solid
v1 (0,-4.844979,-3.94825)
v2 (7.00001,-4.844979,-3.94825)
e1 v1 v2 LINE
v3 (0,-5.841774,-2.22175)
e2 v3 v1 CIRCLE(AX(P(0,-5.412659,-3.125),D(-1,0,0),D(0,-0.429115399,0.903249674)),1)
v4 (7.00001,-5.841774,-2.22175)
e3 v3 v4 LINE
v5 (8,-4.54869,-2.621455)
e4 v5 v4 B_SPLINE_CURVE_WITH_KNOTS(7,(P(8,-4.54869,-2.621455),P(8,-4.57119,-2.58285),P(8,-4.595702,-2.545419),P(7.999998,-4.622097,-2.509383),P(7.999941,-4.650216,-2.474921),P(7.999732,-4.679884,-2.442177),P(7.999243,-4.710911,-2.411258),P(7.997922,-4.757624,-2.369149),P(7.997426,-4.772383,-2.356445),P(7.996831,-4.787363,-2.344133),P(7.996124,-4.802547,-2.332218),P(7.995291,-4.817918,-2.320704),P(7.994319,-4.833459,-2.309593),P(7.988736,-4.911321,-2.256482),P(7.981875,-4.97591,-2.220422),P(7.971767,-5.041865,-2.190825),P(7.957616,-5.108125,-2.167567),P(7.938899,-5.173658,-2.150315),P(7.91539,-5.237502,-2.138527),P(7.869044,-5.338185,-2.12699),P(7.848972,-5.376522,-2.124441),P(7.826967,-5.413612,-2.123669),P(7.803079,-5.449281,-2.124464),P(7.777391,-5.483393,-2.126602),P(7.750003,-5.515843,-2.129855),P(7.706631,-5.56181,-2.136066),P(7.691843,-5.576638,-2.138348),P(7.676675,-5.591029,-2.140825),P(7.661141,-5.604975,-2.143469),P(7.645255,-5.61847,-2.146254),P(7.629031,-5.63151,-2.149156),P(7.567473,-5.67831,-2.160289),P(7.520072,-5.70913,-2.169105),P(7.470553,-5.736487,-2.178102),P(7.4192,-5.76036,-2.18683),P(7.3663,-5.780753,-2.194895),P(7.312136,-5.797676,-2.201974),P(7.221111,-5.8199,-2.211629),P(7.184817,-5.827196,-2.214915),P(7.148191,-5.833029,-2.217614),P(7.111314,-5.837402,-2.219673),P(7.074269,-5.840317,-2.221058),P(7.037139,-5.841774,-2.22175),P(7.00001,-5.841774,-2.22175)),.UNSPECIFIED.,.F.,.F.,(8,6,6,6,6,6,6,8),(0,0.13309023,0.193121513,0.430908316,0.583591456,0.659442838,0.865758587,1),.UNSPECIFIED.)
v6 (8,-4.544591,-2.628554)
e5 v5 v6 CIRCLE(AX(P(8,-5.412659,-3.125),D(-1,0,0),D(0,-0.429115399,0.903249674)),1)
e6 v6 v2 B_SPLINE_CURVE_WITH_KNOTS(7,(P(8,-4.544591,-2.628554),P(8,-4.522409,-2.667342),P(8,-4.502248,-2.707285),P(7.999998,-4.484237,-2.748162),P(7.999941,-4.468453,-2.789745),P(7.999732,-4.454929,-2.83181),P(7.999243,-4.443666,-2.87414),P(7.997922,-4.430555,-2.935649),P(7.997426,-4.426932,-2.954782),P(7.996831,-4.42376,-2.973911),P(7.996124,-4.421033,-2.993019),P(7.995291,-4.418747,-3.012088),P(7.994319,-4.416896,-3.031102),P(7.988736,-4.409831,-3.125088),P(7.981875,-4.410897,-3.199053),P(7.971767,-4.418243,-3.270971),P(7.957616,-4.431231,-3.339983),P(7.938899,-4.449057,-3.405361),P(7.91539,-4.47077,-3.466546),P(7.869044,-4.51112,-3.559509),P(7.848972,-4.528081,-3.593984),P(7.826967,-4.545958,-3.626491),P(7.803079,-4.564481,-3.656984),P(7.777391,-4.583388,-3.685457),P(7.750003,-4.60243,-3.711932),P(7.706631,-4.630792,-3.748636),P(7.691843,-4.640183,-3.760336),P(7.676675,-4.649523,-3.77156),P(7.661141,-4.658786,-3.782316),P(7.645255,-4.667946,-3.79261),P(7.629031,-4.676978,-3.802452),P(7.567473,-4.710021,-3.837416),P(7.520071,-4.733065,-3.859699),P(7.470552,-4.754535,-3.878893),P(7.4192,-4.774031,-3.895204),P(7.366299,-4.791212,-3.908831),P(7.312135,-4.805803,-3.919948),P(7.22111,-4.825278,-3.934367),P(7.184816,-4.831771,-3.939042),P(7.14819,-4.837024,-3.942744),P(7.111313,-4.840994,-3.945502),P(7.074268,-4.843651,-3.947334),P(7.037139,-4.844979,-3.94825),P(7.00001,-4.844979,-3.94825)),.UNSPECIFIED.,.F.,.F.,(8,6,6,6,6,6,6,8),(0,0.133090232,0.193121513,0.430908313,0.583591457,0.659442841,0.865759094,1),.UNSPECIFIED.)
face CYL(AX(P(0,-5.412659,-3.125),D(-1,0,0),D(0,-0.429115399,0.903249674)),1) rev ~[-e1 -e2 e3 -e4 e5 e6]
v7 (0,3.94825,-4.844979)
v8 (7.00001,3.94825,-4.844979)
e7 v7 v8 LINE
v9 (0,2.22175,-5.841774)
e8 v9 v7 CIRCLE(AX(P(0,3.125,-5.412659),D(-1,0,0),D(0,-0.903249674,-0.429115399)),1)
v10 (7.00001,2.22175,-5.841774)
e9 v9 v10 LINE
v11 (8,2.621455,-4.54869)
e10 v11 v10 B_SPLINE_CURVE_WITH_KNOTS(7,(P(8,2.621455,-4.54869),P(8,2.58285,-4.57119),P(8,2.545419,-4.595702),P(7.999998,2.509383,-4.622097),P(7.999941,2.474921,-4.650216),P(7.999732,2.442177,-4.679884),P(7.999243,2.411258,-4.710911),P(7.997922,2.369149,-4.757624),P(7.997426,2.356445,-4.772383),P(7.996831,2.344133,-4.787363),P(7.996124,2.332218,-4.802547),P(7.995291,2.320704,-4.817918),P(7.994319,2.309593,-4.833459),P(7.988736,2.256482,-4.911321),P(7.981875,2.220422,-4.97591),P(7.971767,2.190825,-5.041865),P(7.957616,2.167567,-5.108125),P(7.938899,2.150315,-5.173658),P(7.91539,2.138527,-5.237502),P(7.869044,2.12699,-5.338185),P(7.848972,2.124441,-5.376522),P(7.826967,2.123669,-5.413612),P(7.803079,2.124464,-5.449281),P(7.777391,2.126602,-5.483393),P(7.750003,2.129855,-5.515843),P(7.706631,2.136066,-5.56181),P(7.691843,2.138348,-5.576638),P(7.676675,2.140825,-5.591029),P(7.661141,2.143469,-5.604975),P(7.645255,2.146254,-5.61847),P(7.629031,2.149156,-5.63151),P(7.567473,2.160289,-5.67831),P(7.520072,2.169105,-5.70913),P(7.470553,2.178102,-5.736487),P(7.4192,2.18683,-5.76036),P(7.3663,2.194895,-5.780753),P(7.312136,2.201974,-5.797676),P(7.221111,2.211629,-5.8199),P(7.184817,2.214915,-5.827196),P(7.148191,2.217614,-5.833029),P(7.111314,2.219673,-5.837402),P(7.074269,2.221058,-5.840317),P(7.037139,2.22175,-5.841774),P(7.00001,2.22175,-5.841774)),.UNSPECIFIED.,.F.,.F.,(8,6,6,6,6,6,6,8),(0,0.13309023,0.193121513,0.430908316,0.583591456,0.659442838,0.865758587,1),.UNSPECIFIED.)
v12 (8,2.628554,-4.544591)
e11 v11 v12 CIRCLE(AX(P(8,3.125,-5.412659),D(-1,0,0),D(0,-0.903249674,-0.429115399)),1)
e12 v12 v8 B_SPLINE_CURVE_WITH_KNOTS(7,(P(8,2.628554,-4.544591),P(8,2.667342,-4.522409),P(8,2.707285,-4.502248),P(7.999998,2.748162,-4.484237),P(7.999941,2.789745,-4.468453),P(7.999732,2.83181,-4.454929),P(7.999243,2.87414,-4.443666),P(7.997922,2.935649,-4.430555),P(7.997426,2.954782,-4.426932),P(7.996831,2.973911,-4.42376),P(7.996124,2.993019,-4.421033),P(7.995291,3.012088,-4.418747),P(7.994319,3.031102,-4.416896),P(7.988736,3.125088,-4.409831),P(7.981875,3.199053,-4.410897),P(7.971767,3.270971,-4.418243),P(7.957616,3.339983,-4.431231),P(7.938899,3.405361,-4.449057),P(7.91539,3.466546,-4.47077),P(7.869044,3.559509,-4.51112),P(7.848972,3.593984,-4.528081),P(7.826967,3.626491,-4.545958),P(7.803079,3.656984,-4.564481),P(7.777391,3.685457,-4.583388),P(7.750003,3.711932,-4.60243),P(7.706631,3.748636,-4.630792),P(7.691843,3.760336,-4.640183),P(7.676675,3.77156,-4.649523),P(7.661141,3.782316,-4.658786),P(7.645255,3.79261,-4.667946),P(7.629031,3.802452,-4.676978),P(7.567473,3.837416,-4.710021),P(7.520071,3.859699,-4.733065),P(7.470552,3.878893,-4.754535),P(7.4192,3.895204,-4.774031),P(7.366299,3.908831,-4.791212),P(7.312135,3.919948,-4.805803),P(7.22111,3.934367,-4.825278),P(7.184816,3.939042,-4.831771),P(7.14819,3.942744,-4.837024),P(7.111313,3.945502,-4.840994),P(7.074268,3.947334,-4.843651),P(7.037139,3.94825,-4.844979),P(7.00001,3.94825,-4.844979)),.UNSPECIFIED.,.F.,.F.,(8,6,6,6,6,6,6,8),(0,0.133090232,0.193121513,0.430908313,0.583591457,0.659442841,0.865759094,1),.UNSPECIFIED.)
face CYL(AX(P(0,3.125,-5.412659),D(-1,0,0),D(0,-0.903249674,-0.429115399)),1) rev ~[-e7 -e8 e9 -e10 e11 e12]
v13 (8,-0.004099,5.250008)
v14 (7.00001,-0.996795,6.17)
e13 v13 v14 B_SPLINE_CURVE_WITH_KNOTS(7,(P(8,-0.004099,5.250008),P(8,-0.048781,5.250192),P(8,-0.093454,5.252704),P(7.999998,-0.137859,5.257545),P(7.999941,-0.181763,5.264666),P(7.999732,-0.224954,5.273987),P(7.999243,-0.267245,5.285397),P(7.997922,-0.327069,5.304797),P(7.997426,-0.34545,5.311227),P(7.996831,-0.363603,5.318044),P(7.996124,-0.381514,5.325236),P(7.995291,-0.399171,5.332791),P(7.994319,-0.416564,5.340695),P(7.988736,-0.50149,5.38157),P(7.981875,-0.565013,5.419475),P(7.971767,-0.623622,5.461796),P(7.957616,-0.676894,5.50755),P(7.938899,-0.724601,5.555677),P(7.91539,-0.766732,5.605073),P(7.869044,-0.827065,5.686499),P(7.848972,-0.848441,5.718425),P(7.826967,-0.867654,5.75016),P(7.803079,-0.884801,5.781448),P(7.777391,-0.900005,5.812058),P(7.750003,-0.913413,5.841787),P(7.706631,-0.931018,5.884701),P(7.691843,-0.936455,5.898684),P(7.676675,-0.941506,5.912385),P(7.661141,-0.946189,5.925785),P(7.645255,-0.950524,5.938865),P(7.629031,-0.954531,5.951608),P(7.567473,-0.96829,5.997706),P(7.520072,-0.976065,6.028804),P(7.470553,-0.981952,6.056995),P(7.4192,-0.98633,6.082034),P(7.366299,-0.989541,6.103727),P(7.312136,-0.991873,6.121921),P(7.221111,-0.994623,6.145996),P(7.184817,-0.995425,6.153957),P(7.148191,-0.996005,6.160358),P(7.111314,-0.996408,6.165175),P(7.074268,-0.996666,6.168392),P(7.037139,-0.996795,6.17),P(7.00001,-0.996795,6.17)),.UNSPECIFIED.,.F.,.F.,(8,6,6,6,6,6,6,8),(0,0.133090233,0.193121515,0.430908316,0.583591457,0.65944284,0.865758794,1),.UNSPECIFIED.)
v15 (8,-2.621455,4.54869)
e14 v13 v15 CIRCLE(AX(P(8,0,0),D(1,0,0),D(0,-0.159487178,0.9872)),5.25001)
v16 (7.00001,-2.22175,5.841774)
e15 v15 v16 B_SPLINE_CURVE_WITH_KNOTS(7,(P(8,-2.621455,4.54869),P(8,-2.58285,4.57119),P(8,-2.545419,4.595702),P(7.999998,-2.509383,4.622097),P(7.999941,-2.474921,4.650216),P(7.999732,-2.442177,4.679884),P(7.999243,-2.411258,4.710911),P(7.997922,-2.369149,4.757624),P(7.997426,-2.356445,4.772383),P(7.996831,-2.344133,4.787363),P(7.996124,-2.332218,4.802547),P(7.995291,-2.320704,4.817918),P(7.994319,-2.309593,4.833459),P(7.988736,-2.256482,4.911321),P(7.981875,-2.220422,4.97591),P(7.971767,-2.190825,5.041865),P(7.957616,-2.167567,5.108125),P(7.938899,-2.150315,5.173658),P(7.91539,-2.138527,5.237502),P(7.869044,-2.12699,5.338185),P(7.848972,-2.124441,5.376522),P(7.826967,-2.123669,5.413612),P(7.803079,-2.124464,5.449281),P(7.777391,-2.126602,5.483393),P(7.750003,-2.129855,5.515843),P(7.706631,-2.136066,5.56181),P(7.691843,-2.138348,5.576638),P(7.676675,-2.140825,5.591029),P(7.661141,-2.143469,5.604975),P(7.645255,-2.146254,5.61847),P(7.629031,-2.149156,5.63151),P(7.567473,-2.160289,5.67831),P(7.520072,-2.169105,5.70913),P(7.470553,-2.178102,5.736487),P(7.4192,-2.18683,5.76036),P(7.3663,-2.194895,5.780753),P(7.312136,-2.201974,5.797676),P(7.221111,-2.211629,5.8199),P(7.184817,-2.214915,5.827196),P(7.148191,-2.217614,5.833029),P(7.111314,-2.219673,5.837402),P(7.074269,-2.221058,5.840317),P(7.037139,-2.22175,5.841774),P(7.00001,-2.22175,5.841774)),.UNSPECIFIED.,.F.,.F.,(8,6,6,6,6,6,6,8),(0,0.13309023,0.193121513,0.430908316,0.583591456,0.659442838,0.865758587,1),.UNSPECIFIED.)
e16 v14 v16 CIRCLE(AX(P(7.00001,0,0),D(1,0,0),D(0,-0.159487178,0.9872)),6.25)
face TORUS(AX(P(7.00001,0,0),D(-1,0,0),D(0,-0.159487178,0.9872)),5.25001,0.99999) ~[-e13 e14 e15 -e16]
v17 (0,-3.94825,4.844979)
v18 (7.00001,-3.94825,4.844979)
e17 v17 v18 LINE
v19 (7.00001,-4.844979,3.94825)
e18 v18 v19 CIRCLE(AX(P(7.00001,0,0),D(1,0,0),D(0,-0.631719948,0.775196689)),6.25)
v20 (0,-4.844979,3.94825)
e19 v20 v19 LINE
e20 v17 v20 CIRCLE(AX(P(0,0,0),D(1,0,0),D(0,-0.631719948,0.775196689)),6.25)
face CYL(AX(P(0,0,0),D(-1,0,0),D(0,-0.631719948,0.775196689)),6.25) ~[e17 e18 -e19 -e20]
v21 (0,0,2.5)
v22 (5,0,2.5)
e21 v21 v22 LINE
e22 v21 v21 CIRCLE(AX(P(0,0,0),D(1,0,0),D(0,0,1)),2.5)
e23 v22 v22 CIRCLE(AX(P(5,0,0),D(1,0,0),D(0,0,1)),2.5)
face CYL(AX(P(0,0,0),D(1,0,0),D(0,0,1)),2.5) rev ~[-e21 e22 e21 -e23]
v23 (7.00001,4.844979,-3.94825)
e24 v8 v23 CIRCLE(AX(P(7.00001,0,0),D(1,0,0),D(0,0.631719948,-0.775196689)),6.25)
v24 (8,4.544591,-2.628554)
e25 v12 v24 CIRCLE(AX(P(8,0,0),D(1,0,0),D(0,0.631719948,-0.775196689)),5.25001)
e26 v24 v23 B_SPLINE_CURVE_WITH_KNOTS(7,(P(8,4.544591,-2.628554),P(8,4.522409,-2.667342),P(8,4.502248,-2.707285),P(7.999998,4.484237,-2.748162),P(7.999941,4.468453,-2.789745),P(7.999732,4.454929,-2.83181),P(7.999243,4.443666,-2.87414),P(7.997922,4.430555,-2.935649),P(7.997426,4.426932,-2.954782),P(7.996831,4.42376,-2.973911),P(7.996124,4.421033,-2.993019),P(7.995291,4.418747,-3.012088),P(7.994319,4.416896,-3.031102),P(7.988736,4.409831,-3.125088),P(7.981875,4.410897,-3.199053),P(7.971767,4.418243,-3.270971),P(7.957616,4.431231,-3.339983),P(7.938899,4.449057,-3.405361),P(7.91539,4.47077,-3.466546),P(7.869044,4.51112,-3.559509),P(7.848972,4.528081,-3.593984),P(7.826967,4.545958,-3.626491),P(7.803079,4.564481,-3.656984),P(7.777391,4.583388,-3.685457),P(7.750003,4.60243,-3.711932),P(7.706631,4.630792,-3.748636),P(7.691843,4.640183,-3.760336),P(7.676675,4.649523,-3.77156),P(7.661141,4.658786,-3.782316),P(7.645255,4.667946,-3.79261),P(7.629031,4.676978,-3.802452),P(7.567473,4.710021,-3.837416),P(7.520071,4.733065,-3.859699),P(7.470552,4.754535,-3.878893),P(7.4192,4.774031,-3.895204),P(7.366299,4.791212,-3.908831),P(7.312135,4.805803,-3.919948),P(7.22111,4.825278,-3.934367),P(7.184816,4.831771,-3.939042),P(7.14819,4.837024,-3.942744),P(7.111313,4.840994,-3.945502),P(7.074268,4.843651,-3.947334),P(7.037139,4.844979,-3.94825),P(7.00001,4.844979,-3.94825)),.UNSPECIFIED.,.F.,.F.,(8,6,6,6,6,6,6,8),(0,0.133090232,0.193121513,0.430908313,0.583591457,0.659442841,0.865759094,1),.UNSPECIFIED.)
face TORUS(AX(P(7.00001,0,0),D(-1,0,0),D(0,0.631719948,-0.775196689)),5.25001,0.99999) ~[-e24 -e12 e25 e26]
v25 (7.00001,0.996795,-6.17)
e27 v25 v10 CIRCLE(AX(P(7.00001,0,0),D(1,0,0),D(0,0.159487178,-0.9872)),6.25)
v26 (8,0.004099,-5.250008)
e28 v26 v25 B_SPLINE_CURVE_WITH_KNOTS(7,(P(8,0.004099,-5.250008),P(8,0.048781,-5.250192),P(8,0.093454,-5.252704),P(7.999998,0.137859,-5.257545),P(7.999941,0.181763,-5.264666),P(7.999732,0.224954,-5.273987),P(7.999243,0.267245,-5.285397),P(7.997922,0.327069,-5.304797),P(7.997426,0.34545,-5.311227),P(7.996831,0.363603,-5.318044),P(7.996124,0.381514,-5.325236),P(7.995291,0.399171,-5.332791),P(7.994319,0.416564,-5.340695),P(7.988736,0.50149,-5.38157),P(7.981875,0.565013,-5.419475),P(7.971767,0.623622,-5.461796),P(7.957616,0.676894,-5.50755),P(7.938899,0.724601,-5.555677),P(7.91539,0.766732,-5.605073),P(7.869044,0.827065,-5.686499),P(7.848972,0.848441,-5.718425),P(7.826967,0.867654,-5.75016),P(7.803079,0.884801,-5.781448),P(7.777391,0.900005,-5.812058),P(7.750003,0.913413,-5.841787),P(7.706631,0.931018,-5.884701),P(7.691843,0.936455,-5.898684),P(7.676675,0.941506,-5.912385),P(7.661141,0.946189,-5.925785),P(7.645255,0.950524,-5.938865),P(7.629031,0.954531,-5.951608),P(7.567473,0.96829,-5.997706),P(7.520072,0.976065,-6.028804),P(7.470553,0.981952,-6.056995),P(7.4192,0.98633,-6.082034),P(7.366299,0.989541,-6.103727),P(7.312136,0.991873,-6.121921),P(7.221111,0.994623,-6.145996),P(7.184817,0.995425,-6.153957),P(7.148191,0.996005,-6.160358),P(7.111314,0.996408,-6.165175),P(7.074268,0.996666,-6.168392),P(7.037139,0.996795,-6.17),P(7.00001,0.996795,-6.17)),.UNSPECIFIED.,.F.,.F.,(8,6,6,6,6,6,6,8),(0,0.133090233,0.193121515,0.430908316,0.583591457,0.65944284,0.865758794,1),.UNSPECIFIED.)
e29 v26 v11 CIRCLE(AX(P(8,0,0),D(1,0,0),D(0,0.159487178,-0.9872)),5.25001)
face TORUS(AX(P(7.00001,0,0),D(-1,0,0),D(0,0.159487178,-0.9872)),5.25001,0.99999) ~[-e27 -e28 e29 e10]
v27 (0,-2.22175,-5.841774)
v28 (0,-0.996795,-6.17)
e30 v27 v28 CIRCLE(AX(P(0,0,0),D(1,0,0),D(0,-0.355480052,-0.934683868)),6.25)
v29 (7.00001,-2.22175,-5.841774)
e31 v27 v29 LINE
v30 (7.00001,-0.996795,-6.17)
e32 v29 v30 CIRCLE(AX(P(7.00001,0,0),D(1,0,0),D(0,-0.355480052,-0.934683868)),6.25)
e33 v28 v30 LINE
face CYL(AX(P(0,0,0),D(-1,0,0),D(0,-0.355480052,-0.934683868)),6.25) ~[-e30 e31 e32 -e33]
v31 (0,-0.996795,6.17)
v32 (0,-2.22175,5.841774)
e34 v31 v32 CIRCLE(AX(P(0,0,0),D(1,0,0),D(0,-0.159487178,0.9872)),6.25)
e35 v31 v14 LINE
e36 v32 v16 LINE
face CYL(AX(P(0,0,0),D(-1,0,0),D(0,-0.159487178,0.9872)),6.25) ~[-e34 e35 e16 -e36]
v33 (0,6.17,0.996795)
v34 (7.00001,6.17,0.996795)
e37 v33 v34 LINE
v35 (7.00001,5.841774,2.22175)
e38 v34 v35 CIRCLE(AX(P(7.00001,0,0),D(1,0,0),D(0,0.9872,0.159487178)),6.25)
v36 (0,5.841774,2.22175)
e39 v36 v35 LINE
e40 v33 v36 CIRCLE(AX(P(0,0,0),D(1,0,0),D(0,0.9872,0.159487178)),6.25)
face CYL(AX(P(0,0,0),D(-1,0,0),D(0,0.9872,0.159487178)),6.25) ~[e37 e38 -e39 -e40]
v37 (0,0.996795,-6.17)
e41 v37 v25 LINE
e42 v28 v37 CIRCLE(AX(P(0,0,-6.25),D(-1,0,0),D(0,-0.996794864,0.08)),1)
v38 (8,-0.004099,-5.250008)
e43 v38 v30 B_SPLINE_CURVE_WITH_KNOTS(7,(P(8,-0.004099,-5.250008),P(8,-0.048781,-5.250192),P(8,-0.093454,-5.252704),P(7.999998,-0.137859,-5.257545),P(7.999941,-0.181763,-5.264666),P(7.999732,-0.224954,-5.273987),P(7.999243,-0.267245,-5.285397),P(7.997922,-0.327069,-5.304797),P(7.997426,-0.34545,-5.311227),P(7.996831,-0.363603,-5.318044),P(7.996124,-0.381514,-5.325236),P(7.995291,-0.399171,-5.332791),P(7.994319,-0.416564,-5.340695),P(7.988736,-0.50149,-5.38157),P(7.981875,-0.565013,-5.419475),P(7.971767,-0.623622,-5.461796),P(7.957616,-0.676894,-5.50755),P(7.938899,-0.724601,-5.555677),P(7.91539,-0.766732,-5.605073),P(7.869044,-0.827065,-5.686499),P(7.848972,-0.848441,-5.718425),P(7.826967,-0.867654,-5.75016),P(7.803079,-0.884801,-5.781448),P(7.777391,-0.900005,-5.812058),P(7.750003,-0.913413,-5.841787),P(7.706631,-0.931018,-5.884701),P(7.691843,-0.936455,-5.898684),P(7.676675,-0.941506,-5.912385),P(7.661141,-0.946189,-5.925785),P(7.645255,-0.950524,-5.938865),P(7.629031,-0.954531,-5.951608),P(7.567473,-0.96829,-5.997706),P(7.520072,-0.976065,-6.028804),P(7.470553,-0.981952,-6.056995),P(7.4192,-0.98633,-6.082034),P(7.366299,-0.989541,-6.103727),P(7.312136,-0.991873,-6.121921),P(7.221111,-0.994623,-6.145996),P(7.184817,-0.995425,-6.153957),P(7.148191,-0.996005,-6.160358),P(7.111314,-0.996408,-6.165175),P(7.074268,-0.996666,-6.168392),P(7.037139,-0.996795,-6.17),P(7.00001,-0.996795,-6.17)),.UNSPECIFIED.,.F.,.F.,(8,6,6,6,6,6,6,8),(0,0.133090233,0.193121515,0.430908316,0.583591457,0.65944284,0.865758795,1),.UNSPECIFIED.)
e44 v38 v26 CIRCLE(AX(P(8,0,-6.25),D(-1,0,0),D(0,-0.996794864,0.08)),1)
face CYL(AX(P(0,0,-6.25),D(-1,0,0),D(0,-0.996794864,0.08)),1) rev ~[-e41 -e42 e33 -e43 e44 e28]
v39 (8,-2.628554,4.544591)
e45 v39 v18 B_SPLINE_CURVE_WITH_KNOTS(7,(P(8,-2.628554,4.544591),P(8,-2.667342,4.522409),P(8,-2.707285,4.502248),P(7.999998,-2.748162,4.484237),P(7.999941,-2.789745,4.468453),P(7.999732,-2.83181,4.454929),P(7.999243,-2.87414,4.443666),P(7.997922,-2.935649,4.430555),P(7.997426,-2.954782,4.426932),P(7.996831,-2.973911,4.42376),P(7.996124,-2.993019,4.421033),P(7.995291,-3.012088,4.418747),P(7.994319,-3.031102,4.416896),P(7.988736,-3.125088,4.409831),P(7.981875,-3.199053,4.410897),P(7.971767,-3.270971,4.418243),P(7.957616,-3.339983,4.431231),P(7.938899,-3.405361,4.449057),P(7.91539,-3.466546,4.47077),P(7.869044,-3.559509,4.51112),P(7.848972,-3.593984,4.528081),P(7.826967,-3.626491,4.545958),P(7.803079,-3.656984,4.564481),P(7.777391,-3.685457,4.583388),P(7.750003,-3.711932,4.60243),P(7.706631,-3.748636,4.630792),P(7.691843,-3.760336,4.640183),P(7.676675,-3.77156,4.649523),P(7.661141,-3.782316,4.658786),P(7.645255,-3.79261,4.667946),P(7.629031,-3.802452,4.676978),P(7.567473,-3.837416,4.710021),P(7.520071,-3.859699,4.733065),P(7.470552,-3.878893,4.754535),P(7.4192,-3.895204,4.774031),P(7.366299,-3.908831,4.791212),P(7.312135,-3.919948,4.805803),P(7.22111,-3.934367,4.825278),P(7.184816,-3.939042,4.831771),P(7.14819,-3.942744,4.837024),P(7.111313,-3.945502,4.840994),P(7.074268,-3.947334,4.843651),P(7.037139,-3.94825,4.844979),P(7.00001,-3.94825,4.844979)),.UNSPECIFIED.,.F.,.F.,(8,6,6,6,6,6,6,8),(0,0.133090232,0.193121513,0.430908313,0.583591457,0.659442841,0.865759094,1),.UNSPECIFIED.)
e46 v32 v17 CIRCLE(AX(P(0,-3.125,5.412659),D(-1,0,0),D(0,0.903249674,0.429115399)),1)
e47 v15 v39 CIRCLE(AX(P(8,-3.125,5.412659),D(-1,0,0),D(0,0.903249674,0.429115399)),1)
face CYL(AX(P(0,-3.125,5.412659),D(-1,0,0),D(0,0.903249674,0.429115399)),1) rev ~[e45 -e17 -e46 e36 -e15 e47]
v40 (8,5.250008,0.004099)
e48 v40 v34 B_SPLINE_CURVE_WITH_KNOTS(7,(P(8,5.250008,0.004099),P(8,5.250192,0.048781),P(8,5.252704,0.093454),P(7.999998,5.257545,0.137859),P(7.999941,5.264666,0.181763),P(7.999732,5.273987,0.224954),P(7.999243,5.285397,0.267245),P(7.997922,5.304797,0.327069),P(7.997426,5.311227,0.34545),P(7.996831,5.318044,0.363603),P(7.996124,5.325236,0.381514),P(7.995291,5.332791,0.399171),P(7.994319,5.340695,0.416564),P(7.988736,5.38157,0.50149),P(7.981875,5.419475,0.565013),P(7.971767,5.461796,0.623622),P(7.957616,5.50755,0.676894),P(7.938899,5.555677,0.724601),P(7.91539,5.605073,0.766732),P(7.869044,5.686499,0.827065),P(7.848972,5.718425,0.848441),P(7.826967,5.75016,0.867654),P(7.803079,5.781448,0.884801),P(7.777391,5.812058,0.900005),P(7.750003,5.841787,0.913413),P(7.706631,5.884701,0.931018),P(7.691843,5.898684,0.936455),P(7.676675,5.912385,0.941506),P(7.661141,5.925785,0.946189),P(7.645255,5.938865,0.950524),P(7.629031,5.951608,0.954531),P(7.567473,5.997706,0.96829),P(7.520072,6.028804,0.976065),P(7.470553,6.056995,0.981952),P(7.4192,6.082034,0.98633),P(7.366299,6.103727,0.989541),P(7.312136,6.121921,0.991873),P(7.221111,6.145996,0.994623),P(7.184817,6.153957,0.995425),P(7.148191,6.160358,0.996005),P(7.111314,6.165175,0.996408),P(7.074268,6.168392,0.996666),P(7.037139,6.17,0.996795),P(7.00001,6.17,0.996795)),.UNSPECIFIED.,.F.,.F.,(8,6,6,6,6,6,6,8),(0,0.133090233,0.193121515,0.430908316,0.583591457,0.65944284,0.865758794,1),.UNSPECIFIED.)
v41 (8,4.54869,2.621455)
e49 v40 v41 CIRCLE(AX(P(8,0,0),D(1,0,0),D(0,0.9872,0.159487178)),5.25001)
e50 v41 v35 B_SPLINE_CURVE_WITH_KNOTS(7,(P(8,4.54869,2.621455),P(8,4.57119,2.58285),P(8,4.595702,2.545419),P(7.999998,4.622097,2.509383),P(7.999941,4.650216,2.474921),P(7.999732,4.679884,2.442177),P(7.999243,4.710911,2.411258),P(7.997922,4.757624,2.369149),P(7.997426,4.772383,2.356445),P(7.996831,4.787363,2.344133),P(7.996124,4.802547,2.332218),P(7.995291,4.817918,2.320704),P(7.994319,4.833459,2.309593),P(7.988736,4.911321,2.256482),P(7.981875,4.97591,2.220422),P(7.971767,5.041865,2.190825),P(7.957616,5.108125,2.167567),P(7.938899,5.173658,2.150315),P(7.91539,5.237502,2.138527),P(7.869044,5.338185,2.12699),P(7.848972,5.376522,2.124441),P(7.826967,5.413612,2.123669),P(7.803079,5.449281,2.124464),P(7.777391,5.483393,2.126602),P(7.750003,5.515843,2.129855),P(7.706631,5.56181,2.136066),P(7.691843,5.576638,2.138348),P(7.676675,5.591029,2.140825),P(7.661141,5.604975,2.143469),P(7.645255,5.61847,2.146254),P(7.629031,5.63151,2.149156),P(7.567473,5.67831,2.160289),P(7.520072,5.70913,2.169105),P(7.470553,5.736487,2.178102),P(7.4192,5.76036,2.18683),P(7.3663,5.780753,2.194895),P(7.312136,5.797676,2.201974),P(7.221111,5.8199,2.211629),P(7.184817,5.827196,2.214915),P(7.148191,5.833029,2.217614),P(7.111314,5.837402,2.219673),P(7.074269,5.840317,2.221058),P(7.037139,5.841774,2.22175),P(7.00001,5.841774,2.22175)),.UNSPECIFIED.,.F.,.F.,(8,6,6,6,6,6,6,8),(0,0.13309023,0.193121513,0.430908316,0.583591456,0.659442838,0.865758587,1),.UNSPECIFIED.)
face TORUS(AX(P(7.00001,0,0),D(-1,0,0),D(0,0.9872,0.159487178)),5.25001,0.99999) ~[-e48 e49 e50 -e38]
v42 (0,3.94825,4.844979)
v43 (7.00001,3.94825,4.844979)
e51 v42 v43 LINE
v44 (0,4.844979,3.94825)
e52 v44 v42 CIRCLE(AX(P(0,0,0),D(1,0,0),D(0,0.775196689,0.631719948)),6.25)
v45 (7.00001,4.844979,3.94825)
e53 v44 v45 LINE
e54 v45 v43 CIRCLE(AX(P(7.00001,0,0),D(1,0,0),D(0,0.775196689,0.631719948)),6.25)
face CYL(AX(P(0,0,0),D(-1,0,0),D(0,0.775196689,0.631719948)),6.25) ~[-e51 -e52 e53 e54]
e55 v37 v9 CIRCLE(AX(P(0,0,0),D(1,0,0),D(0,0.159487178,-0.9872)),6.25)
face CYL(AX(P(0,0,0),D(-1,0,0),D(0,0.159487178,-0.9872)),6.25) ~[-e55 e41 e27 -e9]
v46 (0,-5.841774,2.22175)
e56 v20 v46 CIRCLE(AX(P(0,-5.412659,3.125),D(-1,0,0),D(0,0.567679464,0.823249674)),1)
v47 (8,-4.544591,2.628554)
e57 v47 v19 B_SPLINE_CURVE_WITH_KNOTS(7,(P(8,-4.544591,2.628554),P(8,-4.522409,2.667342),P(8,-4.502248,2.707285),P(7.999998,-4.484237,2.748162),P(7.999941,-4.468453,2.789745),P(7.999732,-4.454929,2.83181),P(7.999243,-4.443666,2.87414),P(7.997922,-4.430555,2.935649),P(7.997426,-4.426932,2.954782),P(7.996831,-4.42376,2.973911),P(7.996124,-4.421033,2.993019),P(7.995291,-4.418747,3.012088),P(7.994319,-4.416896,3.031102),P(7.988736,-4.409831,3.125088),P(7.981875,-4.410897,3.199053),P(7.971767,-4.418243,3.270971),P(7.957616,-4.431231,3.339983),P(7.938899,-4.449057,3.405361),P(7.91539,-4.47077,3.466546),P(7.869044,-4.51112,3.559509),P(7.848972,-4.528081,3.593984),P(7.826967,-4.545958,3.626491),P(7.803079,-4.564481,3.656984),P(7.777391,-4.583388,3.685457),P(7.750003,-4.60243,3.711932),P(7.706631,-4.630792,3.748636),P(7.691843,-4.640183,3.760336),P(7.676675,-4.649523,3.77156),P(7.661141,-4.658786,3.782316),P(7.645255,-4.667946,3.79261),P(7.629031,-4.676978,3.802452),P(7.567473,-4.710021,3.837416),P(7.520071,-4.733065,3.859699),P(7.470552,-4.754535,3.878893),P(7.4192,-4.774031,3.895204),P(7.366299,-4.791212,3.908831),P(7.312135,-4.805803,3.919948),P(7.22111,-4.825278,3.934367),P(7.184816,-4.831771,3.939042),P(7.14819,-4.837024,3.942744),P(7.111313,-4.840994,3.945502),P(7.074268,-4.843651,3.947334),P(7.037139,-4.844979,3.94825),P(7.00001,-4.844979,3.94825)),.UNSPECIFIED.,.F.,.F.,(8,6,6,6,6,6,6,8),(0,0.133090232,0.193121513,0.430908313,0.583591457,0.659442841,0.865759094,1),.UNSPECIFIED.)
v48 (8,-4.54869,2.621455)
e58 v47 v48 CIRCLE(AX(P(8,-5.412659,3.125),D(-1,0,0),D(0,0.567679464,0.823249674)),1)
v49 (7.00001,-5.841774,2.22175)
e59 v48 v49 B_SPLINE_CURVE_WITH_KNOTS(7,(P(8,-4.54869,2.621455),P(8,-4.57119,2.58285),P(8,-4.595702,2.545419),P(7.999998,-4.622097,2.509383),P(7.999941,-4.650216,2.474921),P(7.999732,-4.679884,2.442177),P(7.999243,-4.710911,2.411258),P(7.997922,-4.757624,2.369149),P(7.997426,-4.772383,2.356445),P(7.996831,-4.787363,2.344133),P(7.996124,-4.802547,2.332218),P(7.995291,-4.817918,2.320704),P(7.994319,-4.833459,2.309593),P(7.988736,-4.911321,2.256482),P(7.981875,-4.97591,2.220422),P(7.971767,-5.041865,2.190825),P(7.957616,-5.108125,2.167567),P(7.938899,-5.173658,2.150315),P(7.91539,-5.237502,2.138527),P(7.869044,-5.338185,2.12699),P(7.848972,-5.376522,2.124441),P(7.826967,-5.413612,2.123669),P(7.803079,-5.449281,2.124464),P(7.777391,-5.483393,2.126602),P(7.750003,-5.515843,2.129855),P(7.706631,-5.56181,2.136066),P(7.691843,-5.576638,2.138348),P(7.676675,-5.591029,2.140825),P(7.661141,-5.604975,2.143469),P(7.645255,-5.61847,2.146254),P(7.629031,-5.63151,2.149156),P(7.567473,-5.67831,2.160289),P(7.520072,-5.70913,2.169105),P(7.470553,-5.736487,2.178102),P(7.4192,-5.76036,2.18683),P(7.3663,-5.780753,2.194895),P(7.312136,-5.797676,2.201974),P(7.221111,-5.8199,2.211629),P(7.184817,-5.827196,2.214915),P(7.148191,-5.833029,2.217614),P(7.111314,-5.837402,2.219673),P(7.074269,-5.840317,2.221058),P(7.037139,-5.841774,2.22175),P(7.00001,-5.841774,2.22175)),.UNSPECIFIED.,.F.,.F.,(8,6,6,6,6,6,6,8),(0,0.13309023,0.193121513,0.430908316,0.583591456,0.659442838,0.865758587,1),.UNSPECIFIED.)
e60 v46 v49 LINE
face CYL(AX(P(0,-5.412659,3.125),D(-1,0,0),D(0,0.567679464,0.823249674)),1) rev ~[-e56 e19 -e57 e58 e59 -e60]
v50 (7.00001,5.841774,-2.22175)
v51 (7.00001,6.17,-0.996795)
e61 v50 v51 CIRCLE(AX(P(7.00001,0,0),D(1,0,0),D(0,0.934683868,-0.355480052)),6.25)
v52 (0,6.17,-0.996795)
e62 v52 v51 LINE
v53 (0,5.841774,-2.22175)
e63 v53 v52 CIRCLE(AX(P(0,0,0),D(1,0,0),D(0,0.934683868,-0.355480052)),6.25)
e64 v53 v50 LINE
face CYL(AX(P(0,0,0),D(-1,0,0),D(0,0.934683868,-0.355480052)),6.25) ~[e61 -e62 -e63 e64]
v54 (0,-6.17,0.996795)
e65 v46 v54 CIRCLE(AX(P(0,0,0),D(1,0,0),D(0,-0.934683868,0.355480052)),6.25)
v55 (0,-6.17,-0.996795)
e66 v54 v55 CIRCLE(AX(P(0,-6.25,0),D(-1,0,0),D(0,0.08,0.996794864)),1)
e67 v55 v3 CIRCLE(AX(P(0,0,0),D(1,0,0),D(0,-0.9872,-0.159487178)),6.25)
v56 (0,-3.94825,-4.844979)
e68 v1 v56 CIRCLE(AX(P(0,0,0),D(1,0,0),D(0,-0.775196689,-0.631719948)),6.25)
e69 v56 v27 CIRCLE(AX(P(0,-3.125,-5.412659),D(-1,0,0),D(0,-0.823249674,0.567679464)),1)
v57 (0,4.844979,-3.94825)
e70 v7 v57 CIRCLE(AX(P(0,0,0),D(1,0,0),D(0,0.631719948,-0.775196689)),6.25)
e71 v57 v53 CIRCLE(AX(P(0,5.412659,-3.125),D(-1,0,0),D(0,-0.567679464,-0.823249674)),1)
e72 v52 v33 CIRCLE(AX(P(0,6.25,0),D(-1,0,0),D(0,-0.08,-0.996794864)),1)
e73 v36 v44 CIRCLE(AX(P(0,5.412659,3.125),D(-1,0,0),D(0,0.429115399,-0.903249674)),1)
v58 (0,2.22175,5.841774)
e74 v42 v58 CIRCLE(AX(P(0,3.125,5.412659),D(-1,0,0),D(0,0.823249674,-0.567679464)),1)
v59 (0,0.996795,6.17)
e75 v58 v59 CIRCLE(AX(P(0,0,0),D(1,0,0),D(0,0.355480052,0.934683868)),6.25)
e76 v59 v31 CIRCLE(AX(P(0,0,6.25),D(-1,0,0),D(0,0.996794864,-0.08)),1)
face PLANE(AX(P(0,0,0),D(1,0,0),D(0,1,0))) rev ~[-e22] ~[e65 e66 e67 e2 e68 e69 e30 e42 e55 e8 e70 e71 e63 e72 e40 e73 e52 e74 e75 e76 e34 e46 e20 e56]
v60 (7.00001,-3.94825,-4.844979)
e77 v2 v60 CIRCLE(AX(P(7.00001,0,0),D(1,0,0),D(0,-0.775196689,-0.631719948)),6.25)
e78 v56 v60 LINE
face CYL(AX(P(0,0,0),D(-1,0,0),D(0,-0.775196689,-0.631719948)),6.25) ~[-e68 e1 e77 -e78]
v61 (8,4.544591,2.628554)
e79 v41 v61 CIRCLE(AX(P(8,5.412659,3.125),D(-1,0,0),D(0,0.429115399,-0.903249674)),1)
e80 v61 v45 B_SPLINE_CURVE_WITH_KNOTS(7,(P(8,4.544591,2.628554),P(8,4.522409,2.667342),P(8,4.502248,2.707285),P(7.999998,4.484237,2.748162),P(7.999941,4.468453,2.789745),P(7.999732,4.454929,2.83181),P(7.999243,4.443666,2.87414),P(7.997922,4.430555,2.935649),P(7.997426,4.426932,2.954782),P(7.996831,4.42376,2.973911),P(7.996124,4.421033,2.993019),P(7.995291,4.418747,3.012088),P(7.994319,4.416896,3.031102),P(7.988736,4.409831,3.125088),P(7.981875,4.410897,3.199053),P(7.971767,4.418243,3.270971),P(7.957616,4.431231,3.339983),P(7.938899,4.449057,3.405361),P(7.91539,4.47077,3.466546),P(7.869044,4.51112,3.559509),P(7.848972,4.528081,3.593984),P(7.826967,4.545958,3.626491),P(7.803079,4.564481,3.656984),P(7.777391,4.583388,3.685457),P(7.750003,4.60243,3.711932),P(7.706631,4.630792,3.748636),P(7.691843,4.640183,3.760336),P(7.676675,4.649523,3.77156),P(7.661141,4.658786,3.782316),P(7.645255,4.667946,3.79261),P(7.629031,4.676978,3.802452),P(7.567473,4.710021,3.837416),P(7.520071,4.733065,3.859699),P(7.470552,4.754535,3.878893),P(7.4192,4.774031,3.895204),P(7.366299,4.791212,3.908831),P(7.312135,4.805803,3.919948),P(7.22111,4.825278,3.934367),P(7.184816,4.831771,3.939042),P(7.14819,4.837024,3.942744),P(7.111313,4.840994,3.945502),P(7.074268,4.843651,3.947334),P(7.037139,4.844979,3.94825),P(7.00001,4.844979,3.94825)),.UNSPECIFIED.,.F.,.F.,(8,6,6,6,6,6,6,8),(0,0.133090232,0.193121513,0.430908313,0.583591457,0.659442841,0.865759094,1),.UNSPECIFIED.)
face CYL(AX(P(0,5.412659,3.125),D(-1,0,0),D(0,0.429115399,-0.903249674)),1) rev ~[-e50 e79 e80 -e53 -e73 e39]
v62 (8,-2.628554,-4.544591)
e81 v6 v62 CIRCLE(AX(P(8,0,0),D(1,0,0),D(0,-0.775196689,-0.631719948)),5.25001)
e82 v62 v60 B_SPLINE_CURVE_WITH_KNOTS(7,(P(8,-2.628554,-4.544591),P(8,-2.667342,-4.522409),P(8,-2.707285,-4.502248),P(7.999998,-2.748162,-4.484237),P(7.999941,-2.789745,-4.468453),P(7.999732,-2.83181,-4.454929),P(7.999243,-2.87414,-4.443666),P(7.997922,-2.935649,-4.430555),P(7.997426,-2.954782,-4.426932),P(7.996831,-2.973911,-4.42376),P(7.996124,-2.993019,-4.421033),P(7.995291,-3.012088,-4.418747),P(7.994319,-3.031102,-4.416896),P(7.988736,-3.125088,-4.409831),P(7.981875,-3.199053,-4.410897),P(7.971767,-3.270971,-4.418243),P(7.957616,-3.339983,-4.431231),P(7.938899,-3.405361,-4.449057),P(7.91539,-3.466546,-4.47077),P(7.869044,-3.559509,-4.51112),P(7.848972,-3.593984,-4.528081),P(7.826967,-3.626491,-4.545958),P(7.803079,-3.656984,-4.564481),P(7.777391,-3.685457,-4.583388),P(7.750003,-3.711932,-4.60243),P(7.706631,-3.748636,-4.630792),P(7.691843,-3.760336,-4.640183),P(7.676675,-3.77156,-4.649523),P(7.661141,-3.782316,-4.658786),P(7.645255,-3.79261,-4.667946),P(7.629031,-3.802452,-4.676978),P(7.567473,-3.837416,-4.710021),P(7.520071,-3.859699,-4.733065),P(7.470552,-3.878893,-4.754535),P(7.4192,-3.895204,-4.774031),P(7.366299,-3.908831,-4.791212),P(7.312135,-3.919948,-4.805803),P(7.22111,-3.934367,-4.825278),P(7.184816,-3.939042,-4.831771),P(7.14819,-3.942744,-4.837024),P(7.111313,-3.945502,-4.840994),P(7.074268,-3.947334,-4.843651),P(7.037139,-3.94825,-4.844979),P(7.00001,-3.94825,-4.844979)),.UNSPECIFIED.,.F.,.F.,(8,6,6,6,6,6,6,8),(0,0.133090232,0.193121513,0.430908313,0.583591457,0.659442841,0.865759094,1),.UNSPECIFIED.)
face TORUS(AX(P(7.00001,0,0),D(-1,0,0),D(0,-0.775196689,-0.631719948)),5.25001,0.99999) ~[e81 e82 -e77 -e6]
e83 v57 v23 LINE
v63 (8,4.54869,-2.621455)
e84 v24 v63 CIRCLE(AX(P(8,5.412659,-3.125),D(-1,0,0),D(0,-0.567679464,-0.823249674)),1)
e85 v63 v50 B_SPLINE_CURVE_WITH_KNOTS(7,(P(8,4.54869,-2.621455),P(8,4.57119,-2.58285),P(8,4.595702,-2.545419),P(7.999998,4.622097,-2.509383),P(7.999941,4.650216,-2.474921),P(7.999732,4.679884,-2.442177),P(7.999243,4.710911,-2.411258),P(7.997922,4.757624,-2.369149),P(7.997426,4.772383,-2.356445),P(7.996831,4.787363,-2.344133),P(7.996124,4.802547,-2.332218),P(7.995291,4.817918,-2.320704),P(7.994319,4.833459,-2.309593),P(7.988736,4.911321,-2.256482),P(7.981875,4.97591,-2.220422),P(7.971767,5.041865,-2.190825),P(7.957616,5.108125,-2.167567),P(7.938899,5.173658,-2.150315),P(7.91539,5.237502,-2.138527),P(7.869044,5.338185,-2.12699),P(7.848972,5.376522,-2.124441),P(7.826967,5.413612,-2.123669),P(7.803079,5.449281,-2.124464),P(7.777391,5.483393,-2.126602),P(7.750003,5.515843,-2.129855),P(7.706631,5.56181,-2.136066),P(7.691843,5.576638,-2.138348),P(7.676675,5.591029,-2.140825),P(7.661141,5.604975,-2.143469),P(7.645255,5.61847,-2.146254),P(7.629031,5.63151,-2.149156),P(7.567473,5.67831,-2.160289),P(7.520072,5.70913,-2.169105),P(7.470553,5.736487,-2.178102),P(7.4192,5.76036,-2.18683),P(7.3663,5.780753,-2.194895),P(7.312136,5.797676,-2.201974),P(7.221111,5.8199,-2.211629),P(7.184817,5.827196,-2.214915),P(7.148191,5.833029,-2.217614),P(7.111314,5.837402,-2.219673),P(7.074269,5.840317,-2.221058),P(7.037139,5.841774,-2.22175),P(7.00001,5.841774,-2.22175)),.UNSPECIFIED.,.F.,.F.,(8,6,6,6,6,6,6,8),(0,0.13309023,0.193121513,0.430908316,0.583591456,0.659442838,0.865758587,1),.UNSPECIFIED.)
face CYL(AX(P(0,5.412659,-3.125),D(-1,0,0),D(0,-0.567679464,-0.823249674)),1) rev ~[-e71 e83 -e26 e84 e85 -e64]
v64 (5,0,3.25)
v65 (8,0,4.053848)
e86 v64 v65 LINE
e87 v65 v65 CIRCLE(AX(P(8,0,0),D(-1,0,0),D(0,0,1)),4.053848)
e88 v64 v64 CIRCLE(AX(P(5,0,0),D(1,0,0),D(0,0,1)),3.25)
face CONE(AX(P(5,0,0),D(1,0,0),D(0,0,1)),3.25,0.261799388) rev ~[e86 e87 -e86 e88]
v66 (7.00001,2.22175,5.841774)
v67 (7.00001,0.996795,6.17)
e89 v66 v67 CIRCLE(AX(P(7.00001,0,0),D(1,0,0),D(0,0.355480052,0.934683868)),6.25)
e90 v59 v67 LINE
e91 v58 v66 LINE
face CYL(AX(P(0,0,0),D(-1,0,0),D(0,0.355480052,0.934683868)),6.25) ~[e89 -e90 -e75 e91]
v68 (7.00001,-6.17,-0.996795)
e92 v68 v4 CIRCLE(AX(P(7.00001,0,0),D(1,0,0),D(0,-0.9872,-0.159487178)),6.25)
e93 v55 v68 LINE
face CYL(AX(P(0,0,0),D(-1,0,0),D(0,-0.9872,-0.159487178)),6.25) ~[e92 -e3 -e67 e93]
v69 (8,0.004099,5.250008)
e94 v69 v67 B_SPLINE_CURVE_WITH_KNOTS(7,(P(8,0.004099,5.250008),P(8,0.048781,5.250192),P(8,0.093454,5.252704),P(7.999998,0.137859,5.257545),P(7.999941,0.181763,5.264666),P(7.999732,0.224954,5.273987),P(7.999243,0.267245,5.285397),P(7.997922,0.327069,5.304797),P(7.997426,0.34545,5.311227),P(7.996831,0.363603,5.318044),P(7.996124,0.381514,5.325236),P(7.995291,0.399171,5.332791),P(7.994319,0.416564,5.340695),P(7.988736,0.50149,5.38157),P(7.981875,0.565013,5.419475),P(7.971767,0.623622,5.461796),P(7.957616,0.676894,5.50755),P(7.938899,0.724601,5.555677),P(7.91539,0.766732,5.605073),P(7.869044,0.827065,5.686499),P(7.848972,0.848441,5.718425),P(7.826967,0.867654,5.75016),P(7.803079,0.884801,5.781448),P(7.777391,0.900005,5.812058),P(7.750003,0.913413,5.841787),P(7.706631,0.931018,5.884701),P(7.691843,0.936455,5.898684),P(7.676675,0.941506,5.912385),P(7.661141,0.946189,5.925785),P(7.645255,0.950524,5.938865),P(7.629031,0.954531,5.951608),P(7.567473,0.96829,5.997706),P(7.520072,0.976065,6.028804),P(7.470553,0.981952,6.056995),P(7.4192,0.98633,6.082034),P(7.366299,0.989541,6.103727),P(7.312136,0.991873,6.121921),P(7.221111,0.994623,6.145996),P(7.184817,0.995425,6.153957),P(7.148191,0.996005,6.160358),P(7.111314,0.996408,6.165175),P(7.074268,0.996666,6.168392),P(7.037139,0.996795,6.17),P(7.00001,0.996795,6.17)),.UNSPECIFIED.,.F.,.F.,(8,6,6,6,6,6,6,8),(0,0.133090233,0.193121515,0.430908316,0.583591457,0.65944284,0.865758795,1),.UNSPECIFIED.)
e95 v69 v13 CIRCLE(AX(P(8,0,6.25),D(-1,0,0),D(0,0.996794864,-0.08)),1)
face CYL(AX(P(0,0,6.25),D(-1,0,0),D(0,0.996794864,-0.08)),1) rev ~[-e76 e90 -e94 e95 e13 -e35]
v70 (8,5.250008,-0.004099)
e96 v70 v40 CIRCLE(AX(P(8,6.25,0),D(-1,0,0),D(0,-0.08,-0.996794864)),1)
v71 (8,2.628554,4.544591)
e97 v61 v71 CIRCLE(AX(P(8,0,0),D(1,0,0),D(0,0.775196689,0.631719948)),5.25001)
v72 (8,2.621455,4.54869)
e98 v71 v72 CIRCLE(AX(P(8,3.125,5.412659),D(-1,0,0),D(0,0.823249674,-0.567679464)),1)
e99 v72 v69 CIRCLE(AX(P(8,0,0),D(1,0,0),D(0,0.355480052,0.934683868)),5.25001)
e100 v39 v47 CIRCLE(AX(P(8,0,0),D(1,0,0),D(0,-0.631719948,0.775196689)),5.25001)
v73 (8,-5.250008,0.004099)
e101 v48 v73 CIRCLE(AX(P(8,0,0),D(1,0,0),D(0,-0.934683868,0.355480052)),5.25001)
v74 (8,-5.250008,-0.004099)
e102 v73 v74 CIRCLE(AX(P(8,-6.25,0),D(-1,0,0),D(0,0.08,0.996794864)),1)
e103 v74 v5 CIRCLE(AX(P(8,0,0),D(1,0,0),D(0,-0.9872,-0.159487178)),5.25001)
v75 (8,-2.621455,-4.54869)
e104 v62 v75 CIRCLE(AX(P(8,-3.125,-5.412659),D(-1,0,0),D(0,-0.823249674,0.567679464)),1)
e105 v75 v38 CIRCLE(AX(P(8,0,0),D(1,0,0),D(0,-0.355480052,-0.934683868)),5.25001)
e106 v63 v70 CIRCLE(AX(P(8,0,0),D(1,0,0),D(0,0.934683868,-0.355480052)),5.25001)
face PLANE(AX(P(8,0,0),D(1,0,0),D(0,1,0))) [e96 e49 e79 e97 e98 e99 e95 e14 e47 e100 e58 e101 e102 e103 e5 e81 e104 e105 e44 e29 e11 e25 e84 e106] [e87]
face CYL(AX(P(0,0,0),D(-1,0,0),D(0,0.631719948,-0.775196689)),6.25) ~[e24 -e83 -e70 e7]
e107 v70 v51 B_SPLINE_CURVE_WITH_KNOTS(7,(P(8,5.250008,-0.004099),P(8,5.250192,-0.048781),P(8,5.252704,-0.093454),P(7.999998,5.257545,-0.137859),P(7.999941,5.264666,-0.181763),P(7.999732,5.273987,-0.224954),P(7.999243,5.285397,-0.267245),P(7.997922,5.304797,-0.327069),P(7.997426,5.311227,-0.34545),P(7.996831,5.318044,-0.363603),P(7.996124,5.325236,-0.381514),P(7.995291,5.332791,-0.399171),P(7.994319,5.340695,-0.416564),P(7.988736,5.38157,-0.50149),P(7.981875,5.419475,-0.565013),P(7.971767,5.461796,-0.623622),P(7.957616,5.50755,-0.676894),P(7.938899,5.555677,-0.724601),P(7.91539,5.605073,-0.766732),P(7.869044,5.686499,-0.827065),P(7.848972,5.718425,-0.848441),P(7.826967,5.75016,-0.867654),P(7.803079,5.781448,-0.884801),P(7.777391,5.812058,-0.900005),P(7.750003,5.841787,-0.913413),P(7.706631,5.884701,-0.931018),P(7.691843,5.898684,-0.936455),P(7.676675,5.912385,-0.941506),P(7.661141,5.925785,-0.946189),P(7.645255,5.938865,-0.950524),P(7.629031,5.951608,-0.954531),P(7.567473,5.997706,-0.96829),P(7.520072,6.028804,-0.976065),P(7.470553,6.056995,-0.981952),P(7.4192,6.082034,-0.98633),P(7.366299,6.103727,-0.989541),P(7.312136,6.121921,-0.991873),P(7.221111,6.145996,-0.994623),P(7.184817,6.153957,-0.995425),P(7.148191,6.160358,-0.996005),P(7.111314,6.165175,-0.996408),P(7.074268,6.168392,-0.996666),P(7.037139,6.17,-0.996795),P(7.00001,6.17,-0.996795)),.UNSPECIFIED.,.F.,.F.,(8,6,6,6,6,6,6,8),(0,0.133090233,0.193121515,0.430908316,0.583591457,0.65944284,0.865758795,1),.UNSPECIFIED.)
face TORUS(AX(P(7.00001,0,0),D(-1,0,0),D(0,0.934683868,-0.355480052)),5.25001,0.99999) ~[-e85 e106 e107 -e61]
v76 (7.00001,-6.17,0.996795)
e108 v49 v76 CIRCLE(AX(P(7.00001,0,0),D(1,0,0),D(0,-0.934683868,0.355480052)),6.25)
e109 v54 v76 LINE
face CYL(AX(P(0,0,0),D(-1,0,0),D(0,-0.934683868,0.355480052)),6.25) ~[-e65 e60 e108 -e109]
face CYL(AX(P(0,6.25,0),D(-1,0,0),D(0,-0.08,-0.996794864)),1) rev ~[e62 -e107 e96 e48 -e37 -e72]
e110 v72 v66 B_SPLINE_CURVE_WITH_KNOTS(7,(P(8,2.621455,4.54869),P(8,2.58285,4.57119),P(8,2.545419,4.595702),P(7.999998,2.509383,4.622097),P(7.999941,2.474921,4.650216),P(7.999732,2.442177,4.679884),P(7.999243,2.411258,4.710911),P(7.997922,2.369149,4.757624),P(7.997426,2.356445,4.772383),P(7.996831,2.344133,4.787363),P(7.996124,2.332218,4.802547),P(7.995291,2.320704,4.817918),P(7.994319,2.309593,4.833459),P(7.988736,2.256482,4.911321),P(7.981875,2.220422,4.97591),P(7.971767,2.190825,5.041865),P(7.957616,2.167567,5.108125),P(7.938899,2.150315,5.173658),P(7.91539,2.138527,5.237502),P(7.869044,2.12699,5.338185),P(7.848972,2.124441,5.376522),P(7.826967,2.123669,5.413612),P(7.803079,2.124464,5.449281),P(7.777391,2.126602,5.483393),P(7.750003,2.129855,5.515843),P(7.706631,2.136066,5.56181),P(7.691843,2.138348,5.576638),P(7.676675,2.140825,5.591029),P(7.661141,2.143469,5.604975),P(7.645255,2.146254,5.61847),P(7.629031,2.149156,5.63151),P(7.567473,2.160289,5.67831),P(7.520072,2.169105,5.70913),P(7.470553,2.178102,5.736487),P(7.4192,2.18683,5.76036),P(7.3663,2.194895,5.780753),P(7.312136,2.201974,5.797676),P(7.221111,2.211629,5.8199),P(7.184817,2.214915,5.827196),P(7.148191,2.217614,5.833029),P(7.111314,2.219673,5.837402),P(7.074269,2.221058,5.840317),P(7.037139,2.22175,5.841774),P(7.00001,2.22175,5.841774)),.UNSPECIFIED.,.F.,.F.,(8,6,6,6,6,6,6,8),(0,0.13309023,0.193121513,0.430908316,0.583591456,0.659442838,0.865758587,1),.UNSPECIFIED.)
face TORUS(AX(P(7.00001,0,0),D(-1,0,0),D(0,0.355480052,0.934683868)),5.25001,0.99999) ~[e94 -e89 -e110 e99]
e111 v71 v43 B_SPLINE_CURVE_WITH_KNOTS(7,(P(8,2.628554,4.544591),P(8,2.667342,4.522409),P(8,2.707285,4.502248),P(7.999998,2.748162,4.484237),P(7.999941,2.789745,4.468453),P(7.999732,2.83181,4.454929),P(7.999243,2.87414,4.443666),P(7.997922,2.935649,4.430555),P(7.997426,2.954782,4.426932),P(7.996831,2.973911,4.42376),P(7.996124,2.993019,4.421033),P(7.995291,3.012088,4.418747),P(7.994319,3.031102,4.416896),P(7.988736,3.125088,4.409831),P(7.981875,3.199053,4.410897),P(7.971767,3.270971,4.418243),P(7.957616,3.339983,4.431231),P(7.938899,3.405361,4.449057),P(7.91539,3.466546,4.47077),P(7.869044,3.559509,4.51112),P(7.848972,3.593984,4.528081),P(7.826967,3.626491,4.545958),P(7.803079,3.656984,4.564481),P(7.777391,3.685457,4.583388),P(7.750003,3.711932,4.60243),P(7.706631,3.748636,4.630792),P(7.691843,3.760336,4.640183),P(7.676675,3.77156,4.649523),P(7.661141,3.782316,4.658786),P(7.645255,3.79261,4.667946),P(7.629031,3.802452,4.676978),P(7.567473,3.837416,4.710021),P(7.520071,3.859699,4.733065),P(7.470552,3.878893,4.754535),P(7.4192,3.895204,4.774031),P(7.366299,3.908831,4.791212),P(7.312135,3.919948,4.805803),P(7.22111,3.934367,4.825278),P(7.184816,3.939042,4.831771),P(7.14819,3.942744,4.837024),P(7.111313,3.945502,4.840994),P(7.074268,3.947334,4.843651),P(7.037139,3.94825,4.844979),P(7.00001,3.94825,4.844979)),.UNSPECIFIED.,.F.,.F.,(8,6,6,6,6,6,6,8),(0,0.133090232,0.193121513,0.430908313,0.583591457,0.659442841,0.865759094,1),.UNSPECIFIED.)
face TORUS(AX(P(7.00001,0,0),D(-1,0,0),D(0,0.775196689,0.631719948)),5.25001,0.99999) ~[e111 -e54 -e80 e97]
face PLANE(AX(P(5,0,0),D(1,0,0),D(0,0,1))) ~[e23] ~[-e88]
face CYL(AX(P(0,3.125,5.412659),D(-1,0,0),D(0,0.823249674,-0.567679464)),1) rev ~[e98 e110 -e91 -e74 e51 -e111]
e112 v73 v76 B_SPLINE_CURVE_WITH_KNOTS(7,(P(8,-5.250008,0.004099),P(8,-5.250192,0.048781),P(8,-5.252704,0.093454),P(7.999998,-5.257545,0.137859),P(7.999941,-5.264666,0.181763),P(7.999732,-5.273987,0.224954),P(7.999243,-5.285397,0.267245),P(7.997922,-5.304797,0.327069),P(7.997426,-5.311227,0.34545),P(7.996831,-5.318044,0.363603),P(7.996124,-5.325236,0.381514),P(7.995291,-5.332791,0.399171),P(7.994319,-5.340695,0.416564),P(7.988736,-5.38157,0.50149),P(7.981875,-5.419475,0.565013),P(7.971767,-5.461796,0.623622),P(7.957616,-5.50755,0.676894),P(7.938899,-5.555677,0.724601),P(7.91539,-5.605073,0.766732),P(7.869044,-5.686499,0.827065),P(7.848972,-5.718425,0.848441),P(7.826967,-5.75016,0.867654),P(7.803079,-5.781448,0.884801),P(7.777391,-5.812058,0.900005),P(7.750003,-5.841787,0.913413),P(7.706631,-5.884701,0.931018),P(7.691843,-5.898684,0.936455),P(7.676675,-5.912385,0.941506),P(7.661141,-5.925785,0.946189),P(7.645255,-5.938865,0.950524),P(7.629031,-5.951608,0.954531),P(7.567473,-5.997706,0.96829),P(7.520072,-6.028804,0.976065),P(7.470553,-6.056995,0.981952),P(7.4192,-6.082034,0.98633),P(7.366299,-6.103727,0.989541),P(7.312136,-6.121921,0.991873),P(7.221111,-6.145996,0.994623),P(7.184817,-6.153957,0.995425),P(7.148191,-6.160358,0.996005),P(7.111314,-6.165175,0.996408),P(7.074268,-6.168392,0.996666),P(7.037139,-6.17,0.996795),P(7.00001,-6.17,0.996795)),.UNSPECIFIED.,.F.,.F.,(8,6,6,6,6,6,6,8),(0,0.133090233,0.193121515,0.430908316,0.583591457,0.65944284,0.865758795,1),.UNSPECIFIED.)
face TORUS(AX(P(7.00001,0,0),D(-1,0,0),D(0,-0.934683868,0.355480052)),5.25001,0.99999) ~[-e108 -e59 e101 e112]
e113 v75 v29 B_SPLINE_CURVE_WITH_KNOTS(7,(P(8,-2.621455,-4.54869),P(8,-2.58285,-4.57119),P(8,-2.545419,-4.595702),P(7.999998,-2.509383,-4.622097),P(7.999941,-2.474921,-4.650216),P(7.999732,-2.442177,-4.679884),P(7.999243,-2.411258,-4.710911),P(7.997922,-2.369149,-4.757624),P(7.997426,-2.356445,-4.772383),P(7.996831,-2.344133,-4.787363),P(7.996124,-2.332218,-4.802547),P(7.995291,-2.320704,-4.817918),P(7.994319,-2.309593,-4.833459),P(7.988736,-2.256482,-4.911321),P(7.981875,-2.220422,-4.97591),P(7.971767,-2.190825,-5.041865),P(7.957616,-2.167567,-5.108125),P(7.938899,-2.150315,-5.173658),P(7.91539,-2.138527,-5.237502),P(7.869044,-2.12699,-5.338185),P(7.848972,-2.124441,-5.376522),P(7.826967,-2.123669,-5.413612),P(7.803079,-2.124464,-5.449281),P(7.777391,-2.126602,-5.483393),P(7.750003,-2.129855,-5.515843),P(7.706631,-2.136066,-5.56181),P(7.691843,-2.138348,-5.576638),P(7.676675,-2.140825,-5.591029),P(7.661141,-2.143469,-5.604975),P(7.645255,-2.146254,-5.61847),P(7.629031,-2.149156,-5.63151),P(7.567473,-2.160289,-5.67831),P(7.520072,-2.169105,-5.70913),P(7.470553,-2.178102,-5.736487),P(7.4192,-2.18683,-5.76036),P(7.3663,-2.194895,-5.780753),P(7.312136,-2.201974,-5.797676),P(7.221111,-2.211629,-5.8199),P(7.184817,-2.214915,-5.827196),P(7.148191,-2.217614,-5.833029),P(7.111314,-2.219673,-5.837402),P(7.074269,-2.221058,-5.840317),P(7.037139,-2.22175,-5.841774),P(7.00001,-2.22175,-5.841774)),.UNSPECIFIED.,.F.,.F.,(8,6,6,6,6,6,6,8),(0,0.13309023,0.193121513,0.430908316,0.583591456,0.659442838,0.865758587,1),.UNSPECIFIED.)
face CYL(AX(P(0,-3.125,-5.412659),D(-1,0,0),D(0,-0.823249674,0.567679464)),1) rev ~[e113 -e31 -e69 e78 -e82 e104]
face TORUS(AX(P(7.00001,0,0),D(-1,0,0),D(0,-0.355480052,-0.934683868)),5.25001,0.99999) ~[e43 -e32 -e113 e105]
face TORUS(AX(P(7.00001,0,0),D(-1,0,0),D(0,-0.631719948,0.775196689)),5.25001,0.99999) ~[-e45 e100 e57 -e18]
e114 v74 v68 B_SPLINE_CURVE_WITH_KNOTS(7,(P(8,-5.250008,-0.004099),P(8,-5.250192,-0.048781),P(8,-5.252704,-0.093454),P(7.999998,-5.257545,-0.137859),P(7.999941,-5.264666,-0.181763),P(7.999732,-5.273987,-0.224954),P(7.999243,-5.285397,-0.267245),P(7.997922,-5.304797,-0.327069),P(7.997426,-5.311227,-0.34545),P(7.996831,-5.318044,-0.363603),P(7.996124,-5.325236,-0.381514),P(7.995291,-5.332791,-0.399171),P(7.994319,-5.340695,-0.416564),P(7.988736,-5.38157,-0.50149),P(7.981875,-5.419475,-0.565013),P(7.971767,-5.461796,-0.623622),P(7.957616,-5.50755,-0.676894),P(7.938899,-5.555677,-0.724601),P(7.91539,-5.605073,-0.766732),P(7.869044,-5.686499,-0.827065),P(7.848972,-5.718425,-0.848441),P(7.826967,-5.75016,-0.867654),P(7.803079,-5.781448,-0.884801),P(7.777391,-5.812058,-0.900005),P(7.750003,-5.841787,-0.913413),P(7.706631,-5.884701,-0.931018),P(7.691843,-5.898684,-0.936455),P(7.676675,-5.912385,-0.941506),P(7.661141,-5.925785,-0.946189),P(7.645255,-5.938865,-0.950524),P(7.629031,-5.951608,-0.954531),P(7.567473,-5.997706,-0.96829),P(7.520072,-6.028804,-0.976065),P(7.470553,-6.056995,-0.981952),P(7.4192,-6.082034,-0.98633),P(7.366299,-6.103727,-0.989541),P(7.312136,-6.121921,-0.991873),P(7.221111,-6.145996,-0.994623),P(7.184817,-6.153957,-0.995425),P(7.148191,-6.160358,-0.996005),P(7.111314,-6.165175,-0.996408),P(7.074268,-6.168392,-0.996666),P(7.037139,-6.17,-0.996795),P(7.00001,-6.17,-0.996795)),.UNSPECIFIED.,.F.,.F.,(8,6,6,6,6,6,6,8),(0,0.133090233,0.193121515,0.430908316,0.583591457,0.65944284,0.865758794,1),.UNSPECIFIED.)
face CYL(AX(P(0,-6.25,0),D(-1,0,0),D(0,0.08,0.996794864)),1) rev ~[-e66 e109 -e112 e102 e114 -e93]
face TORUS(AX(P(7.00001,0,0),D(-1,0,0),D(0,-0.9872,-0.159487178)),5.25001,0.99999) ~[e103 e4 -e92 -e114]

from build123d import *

# Parameters (mm, degrees)
F2_R     = 4.0538475773
F3_DEPTH = 8
F4_R     = 0.99999


# Not quite as in the source:
# - a fillet or chamfer is up to 0.001 mm smaller than in the source, because OpenCascade refuses the exact size


with BuildPart() as f1:
    # F0 (on Front) → F1 (revolve)
    with BuildSketch(Plane.XZ):
        Polygon((0, 4.0538475773), (0, 2.5), (5, 2.5), (5, 3.25), (8, 4.0538475773), align=None)
    revolve(axis=Axis((3.9731631987, 0, 0), (1, 0, 0)))

    # F2 (on Right) → F3 (join)
    with BuildSketch(Plane.YZ):
        with BuildLine():
            ThreePointArc((-2.2217503258, 5.8417741731), (-2.625, 4.5466333699), (-3.9482496742, 4.8449793096))
            ThreePointArc((-3.9482496742, 4.8449793096), (-4.4194173824, 4.4194173824), (-4.8449793096, 3.9482496742))
            ThreePointArc((-4.8449793096, 3.9482496742), (-4.5466333699, 2.625), (-5.8417741731, 2.2217503258))
            ThreePointArc((-5.8417741731, 2.2217503258), (-6.0370364143, 1.6176190319), (-6.17, 0.9967948636))
            ThreePointArc((-6.17, 0.9967948636), (-5.25, 0), (-6.17, -0.9967948636))
            ThreePointArc((-6.17, -0.9967948636), (-6.0370364143, -1.6176190319), (-5.8417741731, -2.2217503258))
            ThreePointArc((-5.8417741731, -2.2217503258), (-4.5466333699, -2.625), (-4.8449793096, -3.9482496742))
            ThreePointArc((-4.8449793096, -3.9482496742), (-4.4194173824, -4.4194173824), (-3.9482496742, -4.8449793096))
            ThreePointArc((-3.9482496742, -4.8449793096), (-2.625, -4.5466333699), (-2.2217503258, -5.8417741731))
            ThreePointArc((-2.2217503258, -5.8417741731), (-1.6176190319, -6.0370364143), (-0.9967948636, -6.17))
            ThreePointArc((-0.9967948636, -6.17), (0, -5.25), (0.9967948636, -6.17))
            ThreePointArc((0.9967948636, -6.17), (1.6176190319, -6.0370364143), (2.2217503258, -5.8417741731))
            ThreePointArc((2.2217503258, -5.8417741731), (2.625, -4.5466333699), (3.9482496742, -4.8449793096))
            ThreePointArc((3.9482496742, -4.8449793096), (4.4194173824, -4.4194173824), (4.8449793096, -3.9482496742))
            ThreePointArc((4.8449793096, -3.9482496742), (4.5466333699, -2.625), (5.8417741731, -2.2217503258))
            ThreePointArc((5.8417741731, -2.2217503258), (6.0370364143, -1.6176190319), (6.17, -0.9967948636))
            ThreePointArc((6.17, -0.9967948636), (5.25, 0), (6.17, 0.9967948636))
            ThreePointArc((6.17, 0.9967948636), (6.0370364143, 1.6176190319), (5.8417741731, 2.2217503258))
            ThreePointArc((5.8417741731, 2.2217503258), (4.5466333699, 2.625), (4.8449793096, 3.9482496742))
            ThreePointArc((4.8449793096, 3.9482496742), (4.4194173824, 4.4194173824), (3.9482496742, 4.8449793096))
            ThreePointArc((3.9482496742, 4.8449793096), (2.625, 4.5466333699), (2.2217503258, 5.8417741731))
            ThreePointArc((2.2217503258, 5.8417741731), (1.6176190319, 6.0370364143), (0.9967948636, 6.17))
            ThreePointArc((0.9967948636, 6.17), (0, 5.25), (-0.9967948636, 6.17))
            ThreePointArc((-0.9967948636, 6.17), (-1.6176190319, 6.0370364143), (-2.2217503258, 5.8417741731))
        make_face()
        Circle(F2_R, mode=Mode.SUBTRACT)
    extrude(amount=F3_DEPTH)

    # F4 (radius 1 in the source; OpenCascade refuses exactly that, so slightly less here)
    f4_edges = [f1.edges().sort_by_distance(p)[0] for p in [
        (8, -4.419417, 4.419417),
        (8, -1.617619, 6.037036),
        (8, 1.617619, 6.037036),
        (8, 4.419417, 4.419417),
        (8, 6.037036, 1.617619),
        (8, 6.037036, -1.617619),
        (8, 4.419417, -4.419417),
        (8, 1.617619, -6.037036),
        (8, -1.617619, -6.037036),
        (8, -4.419417, -4.419417),
        (8, -6.037036, -1.617619),
        (8, -6.037036, 1.617619),
    ]]
    fillet(f4_edges, radius=F4_R)


solid = f1.part
